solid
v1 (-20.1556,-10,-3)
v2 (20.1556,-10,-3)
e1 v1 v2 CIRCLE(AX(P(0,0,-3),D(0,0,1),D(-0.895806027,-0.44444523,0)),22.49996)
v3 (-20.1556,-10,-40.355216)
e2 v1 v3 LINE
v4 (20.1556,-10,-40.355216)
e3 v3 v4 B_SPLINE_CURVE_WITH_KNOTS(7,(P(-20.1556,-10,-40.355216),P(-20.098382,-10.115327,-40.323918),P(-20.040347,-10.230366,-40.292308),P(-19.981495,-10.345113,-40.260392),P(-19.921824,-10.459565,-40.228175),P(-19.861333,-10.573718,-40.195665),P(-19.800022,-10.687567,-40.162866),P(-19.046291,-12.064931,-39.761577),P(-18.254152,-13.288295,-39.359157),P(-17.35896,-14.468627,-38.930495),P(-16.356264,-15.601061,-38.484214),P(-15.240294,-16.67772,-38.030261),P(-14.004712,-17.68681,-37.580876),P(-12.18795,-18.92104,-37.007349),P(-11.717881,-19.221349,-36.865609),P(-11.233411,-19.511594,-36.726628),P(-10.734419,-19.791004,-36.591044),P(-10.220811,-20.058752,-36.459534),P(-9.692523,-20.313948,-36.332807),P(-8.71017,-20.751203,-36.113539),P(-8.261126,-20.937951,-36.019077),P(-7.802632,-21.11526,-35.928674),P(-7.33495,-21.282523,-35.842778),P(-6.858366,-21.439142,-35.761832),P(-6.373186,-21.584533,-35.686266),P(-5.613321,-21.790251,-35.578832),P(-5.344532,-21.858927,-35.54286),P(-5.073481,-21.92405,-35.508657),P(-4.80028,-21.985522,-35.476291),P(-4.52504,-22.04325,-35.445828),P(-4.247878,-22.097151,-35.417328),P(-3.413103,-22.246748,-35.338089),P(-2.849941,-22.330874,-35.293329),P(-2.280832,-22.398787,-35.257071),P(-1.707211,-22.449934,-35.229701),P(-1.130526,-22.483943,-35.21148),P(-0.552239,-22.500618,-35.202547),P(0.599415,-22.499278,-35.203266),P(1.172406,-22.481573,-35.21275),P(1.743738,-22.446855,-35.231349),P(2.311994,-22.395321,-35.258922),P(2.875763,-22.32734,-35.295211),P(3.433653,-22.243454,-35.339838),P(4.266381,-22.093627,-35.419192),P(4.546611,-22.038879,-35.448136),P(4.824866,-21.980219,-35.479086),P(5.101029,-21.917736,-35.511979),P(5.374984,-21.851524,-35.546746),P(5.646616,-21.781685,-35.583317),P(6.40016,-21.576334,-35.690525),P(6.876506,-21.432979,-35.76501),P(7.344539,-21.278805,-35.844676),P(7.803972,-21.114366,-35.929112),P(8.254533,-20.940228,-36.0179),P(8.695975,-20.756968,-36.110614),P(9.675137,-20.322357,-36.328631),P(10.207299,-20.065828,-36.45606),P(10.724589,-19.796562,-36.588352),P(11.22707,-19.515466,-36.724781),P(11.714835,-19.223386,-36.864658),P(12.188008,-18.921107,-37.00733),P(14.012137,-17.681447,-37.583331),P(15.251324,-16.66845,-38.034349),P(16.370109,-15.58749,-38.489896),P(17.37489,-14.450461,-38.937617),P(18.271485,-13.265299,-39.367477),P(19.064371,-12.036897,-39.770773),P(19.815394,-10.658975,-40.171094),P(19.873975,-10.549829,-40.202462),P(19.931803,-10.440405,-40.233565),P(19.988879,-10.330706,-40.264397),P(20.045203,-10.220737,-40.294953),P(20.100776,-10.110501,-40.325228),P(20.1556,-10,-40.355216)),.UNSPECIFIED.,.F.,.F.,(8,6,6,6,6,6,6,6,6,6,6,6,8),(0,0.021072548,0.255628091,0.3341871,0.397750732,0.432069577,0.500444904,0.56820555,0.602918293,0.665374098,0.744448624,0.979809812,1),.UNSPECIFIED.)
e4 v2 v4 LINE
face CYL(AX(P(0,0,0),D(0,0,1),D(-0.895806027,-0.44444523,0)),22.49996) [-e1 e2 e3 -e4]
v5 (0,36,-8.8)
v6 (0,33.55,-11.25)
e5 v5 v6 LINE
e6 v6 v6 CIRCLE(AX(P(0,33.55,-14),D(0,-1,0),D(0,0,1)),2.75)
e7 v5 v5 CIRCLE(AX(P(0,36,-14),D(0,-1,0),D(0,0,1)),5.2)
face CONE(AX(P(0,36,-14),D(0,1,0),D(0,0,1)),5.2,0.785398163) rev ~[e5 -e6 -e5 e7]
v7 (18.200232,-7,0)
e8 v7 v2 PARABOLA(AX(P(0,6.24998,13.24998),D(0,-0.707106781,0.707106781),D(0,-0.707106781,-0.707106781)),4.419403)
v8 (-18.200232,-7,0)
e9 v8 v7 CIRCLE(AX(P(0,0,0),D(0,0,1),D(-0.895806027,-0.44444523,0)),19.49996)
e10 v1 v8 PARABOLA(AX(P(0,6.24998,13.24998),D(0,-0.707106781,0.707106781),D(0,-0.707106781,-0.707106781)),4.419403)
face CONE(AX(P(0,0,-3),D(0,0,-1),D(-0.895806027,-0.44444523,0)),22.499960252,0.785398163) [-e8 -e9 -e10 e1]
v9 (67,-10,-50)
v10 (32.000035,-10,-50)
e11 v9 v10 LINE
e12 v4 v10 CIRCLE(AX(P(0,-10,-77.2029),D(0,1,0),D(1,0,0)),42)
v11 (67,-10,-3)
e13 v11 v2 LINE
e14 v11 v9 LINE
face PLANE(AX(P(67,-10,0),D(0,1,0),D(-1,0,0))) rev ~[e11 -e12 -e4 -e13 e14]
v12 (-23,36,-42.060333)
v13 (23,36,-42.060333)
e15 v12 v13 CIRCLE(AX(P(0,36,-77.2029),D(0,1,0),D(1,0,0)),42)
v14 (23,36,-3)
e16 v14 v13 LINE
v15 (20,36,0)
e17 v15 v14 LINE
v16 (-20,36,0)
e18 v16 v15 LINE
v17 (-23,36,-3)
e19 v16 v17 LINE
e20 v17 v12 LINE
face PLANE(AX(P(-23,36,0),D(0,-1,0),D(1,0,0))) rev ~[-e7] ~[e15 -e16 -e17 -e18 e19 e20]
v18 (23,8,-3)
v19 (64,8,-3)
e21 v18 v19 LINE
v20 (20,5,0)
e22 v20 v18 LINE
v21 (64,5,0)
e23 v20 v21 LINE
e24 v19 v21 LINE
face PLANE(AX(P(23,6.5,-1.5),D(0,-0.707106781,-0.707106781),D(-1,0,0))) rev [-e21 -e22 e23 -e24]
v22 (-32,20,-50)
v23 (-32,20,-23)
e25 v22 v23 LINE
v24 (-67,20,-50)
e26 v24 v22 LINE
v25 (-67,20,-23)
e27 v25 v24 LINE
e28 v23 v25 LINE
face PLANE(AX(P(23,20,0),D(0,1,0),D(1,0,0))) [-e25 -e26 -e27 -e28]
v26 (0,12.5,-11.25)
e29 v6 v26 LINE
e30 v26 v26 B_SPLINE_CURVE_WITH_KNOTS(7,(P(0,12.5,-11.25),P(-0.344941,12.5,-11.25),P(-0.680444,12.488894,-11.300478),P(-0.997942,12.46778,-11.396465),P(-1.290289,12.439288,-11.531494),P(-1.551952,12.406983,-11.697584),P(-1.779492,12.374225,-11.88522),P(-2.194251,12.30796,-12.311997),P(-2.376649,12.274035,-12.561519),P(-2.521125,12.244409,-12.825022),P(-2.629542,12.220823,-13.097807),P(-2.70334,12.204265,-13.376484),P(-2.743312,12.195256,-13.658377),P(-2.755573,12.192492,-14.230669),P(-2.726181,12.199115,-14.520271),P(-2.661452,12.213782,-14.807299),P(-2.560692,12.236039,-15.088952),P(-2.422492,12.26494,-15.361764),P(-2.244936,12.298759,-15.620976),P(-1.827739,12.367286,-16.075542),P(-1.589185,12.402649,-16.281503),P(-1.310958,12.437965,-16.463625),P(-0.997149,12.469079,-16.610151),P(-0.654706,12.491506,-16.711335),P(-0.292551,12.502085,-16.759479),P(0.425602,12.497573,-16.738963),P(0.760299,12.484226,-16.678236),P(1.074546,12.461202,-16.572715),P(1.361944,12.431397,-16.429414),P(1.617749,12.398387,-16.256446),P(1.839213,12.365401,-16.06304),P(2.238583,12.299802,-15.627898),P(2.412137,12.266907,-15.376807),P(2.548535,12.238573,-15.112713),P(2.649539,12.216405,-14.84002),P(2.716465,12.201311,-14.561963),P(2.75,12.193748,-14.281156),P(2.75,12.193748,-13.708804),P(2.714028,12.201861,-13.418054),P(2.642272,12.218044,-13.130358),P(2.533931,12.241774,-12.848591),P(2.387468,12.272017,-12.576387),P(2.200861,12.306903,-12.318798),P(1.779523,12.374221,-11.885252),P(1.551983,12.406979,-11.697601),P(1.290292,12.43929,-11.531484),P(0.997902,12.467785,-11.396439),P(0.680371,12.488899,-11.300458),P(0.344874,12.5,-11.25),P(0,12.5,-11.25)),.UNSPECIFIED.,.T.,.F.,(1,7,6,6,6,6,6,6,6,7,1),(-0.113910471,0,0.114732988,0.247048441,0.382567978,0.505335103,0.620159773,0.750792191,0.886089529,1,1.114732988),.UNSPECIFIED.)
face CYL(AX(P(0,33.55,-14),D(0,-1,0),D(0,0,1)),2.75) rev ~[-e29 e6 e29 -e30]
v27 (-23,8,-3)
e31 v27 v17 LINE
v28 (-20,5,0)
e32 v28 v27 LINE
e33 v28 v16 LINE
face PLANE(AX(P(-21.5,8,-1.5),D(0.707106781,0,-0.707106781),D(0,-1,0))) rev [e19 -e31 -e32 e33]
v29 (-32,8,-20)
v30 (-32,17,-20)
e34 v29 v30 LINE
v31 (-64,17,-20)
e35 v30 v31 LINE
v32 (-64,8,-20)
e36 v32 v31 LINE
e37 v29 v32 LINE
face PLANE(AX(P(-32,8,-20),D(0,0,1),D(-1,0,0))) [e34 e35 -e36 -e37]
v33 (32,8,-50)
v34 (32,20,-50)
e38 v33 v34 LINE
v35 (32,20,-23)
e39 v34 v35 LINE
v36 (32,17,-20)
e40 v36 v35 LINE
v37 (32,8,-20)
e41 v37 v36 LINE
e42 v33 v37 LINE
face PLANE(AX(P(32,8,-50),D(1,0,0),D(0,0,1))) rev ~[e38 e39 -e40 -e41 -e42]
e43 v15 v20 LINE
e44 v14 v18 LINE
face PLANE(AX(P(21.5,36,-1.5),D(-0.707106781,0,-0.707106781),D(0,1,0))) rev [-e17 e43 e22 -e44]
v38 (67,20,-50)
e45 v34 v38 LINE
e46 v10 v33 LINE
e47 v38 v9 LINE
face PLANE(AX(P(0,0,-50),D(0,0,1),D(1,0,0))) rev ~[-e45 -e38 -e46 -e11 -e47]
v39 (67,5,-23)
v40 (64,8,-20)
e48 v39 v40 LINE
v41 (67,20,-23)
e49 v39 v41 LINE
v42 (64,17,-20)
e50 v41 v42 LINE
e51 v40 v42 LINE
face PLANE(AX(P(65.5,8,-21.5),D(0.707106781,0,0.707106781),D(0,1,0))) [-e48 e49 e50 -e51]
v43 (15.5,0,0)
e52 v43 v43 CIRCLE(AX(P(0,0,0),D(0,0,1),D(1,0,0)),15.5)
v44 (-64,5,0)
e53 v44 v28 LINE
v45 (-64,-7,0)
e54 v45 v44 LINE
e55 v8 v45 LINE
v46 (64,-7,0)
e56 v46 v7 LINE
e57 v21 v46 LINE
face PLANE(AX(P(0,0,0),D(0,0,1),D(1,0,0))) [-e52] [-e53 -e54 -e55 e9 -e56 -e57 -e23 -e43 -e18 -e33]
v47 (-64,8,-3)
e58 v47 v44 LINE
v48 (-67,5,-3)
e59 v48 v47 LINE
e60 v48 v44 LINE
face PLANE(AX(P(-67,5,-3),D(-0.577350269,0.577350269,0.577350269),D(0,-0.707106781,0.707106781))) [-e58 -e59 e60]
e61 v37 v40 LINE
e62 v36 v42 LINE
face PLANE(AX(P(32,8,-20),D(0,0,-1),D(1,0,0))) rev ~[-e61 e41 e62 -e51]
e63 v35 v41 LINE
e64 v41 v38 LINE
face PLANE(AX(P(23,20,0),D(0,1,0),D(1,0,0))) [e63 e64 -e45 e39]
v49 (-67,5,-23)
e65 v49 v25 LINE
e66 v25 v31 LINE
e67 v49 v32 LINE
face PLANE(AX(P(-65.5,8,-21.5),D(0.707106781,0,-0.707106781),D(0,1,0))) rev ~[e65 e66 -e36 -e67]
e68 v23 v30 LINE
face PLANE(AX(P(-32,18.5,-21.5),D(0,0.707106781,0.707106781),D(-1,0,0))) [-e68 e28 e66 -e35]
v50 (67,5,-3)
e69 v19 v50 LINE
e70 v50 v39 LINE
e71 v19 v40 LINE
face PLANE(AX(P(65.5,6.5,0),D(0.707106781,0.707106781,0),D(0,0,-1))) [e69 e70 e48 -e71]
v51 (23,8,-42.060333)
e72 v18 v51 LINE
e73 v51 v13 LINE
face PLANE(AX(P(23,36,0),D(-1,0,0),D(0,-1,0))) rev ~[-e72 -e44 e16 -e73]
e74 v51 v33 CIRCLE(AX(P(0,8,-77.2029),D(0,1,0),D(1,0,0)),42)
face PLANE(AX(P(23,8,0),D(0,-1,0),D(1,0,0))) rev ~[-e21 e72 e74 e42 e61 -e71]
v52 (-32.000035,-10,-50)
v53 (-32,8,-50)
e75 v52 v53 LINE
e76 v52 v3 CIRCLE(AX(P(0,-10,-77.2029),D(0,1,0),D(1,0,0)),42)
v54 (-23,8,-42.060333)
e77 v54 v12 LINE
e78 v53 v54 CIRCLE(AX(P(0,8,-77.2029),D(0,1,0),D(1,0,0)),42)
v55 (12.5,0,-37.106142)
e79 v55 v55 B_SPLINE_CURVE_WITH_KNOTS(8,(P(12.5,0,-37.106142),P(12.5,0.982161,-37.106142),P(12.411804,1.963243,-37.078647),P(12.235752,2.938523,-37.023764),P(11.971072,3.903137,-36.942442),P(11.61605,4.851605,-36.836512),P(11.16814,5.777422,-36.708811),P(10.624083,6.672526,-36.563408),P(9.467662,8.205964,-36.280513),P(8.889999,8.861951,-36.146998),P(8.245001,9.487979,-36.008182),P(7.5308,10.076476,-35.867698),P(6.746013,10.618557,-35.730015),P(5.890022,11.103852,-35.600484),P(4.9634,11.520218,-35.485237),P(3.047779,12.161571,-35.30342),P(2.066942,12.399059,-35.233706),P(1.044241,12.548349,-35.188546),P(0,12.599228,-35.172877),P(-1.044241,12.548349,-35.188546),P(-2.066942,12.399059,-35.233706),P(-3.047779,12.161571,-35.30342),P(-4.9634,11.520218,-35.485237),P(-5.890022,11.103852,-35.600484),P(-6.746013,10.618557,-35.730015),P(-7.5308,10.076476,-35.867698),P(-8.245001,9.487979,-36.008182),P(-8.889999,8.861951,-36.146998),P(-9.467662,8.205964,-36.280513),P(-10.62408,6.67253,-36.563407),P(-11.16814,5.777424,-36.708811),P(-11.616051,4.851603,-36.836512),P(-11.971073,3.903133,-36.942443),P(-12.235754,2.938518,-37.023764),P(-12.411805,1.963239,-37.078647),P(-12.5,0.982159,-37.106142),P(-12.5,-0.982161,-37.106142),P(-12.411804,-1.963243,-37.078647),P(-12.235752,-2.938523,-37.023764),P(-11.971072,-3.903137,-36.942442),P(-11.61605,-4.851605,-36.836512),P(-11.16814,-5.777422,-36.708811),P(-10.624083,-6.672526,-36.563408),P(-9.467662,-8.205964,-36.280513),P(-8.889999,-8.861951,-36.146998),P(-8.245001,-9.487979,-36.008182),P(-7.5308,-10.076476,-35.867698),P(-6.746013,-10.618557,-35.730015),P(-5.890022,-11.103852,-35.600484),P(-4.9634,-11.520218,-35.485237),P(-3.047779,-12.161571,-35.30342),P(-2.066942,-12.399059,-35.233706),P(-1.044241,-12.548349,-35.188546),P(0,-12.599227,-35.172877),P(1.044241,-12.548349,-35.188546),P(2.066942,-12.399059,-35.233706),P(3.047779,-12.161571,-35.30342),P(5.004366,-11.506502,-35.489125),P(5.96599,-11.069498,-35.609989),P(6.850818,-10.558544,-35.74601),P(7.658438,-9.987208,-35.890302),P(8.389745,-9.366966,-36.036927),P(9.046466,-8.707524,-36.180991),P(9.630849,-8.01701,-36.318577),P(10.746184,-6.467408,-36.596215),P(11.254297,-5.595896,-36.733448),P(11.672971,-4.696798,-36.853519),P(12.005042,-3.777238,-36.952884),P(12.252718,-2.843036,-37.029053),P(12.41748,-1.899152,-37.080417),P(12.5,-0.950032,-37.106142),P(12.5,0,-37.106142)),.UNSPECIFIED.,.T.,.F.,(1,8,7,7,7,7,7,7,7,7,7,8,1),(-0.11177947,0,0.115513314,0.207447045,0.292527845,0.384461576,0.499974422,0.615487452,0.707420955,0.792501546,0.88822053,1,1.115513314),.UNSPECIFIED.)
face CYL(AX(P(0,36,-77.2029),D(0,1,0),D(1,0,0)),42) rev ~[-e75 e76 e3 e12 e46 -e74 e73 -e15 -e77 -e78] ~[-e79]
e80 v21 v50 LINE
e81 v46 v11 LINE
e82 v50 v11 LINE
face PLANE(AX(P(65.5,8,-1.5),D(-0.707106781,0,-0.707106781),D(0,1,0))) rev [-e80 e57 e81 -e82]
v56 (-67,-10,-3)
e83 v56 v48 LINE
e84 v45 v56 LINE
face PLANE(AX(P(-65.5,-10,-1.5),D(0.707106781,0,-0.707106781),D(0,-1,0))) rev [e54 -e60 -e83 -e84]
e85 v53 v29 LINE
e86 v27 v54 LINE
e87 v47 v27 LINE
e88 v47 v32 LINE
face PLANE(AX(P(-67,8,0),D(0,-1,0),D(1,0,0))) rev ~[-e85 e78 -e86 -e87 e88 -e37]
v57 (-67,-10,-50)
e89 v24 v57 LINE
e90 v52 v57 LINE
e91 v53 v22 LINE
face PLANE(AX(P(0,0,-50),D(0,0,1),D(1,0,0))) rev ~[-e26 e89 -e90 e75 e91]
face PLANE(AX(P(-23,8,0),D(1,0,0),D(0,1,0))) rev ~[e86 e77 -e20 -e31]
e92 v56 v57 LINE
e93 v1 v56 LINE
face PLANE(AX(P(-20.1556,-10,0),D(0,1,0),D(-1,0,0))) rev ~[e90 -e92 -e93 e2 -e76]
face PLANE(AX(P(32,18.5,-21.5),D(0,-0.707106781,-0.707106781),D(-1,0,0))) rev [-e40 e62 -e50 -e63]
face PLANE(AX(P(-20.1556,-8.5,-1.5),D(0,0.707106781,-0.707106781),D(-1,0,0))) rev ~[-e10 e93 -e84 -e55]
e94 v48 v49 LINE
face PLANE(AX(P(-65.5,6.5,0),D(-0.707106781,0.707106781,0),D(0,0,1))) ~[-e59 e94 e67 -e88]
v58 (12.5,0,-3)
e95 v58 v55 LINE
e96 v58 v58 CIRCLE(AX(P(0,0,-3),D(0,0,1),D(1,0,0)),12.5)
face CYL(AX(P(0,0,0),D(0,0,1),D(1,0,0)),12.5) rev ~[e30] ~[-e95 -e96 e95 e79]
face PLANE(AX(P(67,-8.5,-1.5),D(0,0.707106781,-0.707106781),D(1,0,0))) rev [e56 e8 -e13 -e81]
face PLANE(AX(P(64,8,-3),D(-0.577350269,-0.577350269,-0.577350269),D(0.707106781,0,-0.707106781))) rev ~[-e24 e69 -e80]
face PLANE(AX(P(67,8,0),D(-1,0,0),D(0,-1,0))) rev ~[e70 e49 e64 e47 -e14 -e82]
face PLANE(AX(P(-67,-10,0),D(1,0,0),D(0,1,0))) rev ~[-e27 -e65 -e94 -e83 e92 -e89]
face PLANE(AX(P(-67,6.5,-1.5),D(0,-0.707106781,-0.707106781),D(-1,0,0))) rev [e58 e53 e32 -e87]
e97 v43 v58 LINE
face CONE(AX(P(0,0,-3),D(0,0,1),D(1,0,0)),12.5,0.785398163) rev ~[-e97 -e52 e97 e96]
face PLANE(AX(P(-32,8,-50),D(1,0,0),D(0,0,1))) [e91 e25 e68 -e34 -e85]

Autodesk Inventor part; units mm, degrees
ref_plane "YZ Plane" through (0, 0, 0) normal (1, 0, 0) x (0, 1, 0)
ref_plane "XZ Plane" through (0, 0, 0) normal (0, 1, 0) x (-1, 0, 0)
ref_plane "XY Plane" through (0, 0, 0) normal (0, 0, 1) x (1, 0, 0)
sketch "Szkic1" plane through (0, 0, 0) normal (0, 0, 1) x (1, 0, 0)
  arc A0 (-20.1556, -10) -> (20.1556, -10) centre (0, 0) ccw
  line L0 (-20.1556, -10) -> (-67, -10)
  line L1 (-67, -10) -> (-67, 8)
  line L2 (-67, 8) -> (-23, 8)
  line L3 (-23, 8) -> (-23, 36)
  line L4 (-23, 36) -> (23, 36)
  line L5 (23, 36) -> (23, 8)
  line L6 (23, 8) -> (67, 8)
  line L7 (67, 8) -> (67, -10)
  line L8 (67, -10) -> (20.1556, -10)
  point P0 (0, -22.5)
  dimension "d0" = 45
  dimension "d1" = 10
  dimension "d2" = 18
  dimension "d3" = 46
  dimension "d4" = 44
  dimension "d5" = 44
  dimension "d6" = 23
  dimension "d7" = 58.5
extrude "Wyciągnięcie proste1" add sketch "Szkic1" against normal blind 50
sketch "Szkic2" plane through (0, 0, 0) normal (0, 0, 1) x (1, 0, 0)
  circle A0 centre (0, 0) radius 12.5
  dimension "d10" = 25
extrude "Wyciągnięcie proste2" cut sketch "Szkic2" against normal blind 50
sketch "Szkic3" plane through (23, 8, 0) normal (0, 1, 0) x (1, 0, 0)
  line L0 (0, 50) -> (44, 50) projected
  line L1 (44, 50) -> (9, 50)
  line L2 (9, 50) -> (9, 20)
  line L3 (9, 20) -> (44, 20)
  line L4 (44, 20) -> (44, 50)
  line L5 (-90, 50) -> (-46, 50) projected
  line L6 (-90, 50) -> (-55, 50)
  line L7 (-55, 50) -> (-55, 20)
  line L8 (-55, 20) -> (-90, 20)
  line L9 (-90, 20) -> (-90, 50)
  point P0 (-23, 0)
  point P1 (9, 50)
  dimension "d13" = 35
  dimension "d14" = 30
  dimension "d15" = 35
  dimension "d16" = 30
extrude "Wyciągnięcie proste3" add sketch "Szkic3" along normal blind 12
sketch "Szkic4" plane through (-23, 36, 0) normal (0, 1, 0) x (1, 0, 0)
  circle A0 centre (23, 77.2029) radius 42
  point P0 (23, 0)
  point P1 (-9, 50)
  point P2 (55, 50)
  dimension "d19" = 84
extrude "Wyciągnięcie proste4" cut sketch "Szkic4" against normal blind 141.25
chamfer "Faza1" distance 3 angle 45 16 edges at (-45, 8, 0) (-23, 22, 0) (-67, 8, -10) (-67, 14, -20) (-49.5, 20, -20) (-67, -1, 0) (-43.5778, -10, 0) (0, -22.5, 0) (43.5778, -10, 0) (67, -1, 0) (45, 8, 0) (23, 22, 0) (67, 8, -10) (67, 14, -20) (49.5, 20, -20) (-12.5, 0, 0)
sketch "Szkic5" plane through (0, 36, -77.2029) normal (0, 1, 0) x (1, 0, 0)
  point P0 (0, -77.2029)
  point P1 (0, -63.2029)
  point P2 (161.096, 29.7407)
  dimension "d25" = 14
hole "Otwór1" at (161.096, 36, -106.9437) at (0, 36, -14) direction (0, -1, 0) diameter 5.5 depth 23.81 tip angle 118 countersink diameter 10.4 countersink angle 90
properties part number "zad 8"
